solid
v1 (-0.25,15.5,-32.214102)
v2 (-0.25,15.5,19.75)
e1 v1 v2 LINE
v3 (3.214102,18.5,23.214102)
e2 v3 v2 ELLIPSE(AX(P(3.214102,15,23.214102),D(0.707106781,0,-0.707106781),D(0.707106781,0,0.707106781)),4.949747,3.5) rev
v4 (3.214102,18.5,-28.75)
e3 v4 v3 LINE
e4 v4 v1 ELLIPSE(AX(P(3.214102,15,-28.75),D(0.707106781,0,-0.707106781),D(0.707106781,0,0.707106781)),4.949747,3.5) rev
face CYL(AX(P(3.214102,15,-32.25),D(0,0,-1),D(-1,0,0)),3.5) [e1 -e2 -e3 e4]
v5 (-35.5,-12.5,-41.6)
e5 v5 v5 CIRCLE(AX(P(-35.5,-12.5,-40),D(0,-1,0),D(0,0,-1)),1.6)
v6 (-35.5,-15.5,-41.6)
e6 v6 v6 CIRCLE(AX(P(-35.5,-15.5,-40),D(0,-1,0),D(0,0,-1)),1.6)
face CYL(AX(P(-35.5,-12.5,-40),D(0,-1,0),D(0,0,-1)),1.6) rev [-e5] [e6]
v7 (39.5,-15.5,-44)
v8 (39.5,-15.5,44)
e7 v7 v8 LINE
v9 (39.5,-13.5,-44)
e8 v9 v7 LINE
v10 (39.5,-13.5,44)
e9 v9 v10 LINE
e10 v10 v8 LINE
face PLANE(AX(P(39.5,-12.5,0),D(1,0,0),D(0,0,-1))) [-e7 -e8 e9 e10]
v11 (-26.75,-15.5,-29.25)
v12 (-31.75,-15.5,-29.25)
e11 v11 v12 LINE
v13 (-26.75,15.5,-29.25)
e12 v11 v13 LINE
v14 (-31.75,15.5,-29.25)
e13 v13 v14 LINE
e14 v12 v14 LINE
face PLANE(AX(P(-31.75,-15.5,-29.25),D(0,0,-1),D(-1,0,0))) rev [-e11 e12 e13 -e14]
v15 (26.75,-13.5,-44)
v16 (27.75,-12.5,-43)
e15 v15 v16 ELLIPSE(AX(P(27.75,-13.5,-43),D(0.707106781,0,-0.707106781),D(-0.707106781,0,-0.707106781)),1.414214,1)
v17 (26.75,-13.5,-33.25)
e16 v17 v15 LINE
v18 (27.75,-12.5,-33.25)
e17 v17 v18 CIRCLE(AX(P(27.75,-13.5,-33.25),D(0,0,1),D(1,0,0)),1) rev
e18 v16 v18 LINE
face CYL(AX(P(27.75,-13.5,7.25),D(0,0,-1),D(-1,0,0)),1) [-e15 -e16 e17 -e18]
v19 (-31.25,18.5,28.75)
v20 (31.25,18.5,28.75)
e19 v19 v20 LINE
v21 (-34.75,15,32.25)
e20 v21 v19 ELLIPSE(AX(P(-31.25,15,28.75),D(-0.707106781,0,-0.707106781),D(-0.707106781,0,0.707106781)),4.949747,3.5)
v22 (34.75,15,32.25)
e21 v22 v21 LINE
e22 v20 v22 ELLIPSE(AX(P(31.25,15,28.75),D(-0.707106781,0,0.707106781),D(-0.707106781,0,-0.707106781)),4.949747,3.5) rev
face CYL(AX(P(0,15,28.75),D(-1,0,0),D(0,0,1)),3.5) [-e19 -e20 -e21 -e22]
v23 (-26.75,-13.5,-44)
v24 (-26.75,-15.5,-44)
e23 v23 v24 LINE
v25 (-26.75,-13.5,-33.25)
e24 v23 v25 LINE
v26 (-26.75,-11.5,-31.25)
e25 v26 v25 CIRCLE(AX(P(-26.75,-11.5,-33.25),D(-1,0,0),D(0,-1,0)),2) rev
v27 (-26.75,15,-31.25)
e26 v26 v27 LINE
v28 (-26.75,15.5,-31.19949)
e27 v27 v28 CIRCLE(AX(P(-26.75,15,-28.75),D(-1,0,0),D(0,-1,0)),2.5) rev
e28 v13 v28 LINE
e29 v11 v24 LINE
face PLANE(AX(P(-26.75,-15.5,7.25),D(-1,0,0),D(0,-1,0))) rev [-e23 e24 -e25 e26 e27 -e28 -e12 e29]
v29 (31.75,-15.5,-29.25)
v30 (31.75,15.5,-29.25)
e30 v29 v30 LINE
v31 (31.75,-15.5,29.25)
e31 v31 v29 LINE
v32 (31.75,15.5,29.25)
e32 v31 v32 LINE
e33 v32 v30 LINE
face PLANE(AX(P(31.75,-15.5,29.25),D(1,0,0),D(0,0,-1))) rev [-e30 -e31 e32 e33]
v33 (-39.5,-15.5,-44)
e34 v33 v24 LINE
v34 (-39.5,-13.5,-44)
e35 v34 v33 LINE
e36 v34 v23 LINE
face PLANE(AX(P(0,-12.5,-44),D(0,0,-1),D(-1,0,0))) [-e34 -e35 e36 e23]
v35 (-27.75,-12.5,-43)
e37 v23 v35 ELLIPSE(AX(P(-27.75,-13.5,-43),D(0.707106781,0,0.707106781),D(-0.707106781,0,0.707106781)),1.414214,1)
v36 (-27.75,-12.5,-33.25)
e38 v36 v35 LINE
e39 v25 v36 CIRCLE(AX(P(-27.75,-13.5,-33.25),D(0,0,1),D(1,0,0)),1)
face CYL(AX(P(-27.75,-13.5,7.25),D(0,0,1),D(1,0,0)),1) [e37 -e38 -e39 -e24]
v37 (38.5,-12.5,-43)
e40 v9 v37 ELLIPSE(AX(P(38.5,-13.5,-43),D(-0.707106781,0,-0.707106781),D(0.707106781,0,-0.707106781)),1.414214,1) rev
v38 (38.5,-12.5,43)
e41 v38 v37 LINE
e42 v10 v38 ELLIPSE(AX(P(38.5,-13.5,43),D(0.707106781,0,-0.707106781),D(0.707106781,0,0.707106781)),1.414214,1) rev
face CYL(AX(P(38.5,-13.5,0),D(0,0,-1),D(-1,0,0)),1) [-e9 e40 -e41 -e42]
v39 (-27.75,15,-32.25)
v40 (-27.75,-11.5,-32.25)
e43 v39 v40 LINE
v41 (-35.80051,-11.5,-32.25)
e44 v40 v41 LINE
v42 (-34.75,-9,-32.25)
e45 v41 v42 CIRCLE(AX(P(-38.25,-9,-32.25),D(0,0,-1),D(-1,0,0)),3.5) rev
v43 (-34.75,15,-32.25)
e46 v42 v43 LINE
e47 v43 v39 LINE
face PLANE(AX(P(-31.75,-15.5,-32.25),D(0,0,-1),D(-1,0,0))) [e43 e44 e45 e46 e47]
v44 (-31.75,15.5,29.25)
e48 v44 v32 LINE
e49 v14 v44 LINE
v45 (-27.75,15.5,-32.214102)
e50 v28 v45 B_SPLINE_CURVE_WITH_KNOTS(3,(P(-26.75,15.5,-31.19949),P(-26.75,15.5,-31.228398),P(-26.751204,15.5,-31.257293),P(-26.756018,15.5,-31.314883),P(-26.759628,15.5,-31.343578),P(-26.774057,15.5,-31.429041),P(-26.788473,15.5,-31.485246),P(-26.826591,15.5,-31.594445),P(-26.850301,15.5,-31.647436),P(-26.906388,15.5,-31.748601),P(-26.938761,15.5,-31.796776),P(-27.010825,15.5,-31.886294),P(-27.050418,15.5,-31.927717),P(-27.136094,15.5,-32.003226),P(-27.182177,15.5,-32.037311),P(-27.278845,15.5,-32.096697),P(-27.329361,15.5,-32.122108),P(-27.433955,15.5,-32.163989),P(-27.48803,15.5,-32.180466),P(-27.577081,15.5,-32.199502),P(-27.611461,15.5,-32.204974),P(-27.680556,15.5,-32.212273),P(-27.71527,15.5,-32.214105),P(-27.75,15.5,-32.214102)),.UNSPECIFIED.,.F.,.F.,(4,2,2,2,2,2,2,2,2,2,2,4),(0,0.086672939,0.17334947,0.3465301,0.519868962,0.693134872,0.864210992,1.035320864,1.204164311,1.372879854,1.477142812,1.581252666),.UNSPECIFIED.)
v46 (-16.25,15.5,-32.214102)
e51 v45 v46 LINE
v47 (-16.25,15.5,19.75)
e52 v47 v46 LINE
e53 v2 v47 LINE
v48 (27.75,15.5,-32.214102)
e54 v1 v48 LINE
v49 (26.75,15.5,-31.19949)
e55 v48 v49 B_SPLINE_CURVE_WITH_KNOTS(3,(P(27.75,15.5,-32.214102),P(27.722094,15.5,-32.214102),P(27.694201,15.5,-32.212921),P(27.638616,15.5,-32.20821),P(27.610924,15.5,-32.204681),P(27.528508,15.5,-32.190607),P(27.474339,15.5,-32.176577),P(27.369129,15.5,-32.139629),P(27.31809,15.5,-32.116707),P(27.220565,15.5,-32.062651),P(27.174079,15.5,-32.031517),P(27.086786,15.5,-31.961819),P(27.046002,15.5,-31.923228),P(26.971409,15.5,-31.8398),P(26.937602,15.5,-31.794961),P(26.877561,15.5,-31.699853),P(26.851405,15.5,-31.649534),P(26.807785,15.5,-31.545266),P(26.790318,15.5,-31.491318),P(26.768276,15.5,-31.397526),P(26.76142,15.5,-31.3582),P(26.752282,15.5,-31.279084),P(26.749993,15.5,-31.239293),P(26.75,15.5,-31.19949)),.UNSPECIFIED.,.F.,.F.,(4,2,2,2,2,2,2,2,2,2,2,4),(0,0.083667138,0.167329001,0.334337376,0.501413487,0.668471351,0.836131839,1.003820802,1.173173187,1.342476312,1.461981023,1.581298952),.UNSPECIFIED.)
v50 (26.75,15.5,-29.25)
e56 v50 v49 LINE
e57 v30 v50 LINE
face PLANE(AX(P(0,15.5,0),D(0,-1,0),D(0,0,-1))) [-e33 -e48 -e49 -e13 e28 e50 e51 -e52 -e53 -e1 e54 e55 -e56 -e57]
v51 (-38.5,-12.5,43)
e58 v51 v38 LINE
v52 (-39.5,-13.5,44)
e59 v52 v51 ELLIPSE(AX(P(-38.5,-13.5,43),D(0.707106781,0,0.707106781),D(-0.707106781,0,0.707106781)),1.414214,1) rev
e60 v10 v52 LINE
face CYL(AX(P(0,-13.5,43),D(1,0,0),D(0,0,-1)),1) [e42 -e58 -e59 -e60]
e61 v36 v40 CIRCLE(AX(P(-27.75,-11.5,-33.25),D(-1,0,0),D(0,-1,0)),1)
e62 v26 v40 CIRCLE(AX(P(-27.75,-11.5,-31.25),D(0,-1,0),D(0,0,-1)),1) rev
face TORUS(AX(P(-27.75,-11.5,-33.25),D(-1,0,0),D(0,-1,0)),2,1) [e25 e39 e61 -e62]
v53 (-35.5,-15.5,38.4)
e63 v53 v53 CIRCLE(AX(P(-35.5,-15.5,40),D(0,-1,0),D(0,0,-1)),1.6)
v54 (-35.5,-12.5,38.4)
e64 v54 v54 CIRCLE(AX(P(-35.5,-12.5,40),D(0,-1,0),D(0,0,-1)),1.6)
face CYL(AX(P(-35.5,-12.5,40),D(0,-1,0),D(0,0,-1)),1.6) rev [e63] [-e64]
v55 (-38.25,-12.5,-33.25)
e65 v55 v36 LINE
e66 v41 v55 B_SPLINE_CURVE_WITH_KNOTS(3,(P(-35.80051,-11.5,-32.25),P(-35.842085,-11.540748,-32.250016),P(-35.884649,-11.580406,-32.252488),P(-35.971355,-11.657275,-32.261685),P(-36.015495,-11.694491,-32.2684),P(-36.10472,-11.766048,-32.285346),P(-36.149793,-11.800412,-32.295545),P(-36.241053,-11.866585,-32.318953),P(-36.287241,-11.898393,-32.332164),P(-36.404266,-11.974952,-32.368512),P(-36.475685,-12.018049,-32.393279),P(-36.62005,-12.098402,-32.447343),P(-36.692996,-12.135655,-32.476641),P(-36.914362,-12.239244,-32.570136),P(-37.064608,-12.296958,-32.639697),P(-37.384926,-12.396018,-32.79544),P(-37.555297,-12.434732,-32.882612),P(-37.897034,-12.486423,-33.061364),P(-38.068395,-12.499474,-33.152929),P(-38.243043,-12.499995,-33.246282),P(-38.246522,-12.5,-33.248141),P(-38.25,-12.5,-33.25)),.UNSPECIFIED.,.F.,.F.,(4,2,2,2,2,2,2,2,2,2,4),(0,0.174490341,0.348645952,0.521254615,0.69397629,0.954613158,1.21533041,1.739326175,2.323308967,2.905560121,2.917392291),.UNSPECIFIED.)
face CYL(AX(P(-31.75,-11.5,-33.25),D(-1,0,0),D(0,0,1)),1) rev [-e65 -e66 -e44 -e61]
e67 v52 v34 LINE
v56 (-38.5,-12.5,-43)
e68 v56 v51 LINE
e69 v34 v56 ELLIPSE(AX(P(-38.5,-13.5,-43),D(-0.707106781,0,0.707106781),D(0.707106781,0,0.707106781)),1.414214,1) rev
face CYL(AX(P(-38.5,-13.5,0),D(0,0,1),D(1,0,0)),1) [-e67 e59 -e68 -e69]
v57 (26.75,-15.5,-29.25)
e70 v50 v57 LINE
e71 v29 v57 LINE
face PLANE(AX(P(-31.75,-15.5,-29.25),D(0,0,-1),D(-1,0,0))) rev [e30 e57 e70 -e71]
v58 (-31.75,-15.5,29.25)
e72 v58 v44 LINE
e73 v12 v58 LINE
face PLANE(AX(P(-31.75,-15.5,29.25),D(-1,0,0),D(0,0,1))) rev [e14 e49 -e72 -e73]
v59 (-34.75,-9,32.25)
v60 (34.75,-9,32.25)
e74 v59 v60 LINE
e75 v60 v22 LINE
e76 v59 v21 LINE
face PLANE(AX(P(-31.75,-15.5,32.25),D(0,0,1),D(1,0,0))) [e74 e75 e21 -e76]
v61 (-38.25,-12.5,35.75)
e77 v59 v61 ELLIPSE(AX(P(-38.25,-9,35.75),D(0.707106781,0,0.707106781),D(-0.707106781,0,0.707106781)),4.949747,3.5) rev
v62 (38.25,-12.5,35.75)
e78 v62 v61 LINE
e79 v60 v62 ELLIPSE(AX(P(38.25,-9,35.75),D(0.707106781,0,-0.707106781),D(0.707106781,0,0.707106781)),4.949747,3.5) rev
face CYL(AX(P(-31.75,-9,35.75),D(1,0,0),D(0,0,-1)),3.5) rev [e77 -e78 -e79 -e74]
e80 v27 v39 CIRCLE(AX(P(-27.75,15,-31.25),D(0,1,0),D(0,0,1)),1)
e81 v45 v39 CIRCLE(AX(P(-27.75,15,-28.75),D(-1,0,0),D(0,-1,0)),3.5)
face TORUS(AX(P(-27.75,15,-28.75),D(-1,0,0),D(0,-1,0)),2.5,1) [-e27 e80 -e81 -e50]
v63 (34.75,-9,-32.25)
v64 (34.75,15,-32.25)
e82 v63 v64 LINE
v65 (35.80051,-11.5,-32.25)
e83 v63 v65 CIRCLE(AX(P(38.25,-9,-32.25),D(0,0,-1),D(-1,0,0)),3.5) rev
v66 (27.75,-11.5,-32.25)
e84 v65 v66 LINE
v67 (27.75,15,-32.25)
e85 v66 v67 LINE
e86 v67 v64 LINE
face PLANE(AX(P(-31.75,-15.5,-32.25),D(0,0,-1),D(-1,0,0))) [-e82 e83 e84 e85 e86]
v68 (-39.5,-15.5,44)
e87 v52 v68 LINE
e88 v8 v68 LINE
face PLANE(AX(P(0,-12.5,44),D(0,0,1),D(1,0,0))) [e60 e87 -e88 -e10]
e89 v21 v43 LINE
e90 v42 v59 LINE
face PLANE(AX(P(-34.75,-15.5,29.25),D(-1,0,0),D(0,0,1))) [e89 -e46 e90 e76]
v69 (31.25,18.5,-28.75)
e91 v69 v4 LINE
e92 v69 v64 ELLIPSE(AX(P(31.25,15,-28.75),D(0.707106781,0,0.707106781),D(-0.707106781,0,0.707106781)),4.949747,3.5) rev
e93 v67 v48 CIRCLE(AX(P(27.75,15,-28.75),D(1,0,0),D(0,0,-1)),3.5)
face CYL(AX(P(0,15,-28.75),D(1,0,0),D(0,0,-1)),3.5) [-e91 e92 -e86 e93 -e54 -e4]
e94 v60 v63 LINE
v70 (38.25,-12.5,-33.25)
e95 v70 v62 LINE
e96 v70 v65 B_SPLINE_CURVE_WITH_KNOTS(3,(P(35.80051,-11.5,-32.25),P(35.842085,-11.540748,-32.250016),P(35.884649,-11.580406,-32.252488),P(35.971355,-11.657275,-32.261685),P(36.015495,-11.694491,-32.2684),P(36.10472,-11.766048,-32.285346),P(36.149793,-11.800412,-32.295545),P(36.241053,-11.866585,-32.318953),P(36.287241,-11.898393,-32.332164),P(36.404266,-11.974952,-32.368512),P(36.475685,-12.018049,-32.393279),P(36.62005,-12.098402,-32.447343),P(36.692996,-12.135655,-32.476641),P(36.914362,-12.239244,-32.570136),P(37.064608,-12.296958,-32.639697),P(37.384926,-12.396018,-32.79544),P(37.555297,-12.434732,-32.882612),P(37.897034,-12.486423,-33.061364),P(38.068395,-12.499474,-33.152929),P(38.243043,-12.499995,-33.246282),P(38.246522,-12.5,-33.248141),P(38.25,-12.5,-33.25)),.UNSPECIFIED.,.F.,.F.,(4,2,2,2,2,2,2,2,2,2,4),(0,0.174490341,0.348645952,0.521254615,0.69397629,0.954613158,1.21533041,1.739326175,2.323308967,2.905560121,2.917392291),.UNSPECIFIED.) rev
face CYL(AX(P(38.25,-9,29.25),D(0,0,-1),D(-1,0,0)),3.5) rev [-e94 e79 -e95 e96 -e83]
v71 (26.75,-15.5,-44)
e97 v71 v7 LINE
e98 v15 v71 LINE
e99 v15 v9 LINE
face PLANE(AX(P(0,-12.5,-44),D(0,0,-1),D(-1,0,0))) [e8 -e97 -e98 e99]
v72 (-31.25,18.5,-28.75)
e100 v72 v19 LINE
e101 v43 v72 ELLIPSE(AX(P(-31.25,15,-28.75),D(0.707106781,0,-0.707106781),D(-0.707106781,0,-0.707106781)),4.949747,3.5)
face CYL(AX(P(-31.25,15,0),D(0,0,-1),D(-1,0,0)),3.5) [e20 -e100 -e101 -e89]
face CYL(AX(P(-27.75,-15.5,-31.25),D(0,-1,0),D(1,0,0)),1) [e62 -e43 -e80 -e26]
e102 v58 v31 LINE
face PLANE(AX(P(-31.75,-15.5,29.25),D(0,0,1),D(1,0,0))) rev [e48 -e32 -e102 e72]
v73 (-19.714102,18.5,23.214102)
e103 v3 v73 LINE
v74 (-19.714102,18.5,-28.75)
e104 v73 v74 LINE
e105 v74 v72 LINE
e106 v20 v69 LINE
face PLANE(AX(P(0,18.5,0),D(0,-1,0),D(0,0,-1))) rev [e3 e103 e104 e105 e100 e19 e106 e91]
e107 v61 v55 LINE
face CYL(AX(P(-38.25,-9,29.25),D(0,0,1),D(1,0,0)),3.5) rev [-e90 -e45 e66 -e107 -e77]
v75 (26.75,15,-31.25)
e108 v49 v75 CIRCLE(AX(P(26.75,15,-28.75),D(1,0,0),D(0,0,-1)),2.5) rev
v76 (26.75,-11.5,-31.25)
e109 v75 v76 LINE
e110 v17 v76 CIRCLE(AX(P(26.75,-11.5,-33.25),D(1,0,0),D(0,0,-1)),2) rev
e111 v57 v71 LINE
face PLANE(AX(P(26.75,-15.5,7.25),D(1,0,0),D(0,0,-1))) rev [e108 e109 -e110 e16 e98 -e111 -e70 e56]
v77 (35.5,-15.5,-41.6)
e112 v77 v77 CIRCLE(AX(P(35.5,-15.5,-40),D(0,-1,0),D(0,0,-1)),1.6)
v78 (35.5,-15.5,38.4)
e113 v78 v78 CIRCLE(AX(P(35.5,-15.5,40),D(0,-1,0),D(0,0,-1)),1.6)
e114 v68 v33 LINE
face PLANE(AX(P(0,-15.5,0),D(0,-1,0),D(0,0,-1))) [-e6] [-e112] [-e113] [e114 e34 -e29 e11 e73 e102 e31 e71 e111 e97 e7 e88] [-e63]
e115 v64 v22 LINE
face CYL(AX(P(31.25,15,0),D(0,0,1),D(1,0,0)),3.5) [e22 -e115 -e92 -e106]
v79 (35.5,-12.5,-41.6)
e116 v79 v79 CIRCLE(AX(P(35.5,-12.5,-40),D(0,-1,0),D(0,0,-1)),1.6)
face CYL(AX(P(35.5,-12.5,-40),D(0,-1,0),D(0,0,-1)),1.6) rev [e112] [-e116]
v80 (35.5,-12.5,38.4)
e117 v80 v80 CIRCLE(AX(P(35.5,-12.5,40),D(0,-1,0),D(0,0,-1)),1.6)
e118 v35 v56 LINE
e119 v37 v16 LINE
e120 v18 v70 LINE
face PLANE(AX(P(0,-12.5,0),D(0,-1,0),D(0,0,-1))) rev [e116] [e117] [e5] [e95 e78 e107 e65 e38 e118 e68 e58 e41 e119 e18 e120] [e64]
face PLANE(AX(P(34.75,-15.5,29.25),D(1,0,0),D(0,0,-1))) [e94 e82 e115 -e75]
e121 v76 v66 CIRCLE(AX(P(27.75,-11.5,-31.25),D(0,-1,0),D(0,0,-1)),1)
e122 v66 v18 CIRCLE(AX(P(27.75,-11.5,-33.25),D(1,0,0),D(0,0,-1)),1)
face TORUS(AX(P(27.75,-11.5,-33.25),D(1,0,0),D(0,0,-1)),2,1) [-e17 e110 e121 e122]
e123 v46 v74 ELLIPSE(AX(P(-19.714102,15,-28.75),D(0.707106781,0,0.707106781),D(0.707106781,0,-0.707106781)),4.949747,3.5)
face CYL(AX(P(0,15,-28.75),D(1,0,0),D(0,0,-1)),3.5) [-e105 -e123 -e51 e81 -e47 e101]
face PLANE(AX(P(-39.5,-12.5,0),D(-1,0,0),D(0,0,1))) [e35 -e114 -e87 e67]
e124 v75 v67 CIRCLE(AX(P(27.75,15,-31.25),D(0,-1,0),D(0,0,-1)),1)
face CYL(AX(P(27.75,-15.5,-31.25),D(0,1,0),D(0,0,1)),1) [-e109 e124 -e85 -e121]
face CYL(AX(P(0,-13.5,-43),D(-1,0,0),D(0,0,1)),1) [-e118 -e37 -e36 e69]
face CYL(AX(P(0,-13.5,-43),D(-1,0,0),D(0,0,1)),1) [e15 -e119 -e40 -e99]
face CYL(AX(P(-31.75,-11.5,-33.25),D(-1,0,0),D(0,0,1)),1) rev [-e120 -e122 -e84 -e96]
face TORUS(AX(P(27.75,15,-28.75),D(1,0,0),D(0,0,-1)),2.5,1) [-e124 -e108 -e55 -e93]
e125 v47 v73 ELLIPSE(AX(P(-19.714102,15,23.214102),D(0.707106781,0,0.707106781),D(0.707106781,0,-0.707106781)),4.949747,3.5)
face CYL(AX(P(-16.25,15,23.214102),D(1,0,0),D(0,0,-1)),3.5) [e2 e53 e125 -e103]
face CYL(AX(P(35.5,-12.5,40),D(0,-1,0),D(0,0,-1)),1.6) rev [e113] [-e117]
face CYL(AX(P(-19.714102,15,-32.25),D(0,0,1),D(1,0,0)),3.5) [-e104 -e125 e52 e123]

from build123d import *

# Parameters (mm, degrees)
BOSS_EXTRUDE1_DEPTH      = 15.5
BOSS_EXTRUDE1_DEPTH_BACK = 15.5
SKETCH1_W                = 63.5
SKETCH1_H                = 58.5
SHELL1_T                 = 3
SKETCH2_W                = 16
SKETCH2_H                = 52
CUT_EXTRUDE1_DEPTH       = 39.5
SKETCH3_W                = 53.5
SKETCH3_H                = 31
CUT_EXTRUDE2_DEPTH       = 39.5
BOSS_EXTRUDE2_START      = -15.5
SKETCH4_R                = 1.6
BOSS_EXTRUDE2_DEPTH      = 3
FILLET1_R                = 3.5
FILLET2_R                = 1


with BuildPart() as part:
    # Sketch1 → Boss-Extrude1 (new, two sides: drawn at the far end of the back side and taken through both)
    with BuildSketch(Plane(origin=(0, 0, 0), x_dir=(1, 0, 0), z_dir=(0, 1, 0)).offset(-BOSS_EXTRUDE1_DEPTH_BACK)):
        Rectangle(SKETCH1_W, SKETCH1_H)
    extrude(amount=BOSS_EXTRUDE1_DEPTH + BOSS_EXTRUDE1_DEPTH_BACK)

    # Shell1
    shell1_openings = [part.faces().sort_by_distance(p)[0] for p in [
        (0, -15.5, 0),
    ]]
    offset(amount=SHELL1_T, openings=shell1_openings, kind=Kind.INTERSECTION)

    # Sketch2 → Cut-Extrude1 (cut)
    with BuildSketch(Plane(origin=(0, 18.5, 0), x_dir=(1, 0, 0), z_dir=(0, 1, 0))):
        with Locations((-8.25, 6.25)):
            Rectangle(SKETCH2_W, SKETCH2_H)
    extrude(amount=-CUT_EXTRUDE1_DEPTH, mode=Mode.SUBTRACT)

    # Sketch3 → Cut-Extrude2 (cut)
    with BuildSketch(Plane(origin=(0, 0, -32.25), x_dir=(-1, 0, 0), z_dir=(0, 0, -1))):
        Rectangle(SKETCH3_W, SKETCH3_H)
    extrude(amount=-CUT_EXTRUDE2_DEPTH, mode=Mode.SUBTRACT)

    # Sketch4 → Boss-Extrude2 (add)
    with BuildSketch(Plane(origin=(0, 0, 0), x_dir=(1, 0, 0), z_dir=(0, 1, 0)).offset(BOSS_EXTRUDE2_START)):
        Polygon((-26.75, 32.25), (-26.75, 44), (-39.5, 44), (-39.5, -44), (39.5, -44), (39.5, 44), (26.75, 44), (26.75, 32.25), (34.75, 32.25), (34.75, -32.25), (-34.75, -32.25), (-34.75, 32.25), align=None)
        with Locations(Location((-35.5, 40, 0), (0, 0, 90))):
            Circle(SKETCH4_R, mode=Mode.SUBTRACT)
        with Locations(Location((-35.5, -40, 0), (0, 0, 90))):
            Circle(SKETCH4_R, mode=Mode.SUBTRACT)
        with Locations(Location((35.5, -40, 0), (0, 0, 90))):
            Circle(SKETCH4_R, mode=Mode.SUBTRACT)
        with Locations(Location((35.5, 40, 0), (0, 0, 90))):
            Circle(SKETCH4_R, mode=Mode.SUBTRACT)
    extrude(amount=BOSS_EXTRUDE2_DEPTH)

    # Fillet1
    # the kernel refuses this fillet: 3.5 mm, written as the material it adds along each edge
    with BuildSketch(Plane(origin=(34.75, -12.5, -32.25), x_dir=(1, 0, 0), z_dir=(0, 0, 1)), Plane(origin=(-34.75, -12.5, 32.25), x_dir=(-1, 0, 0), z_dir=(0, 0, -1))) as fillet1_piece_1:
        with BuildLine():
            CenterArc((FILLET1_R, FILLET1_R), FILLET1_R, 180, 90)
            Line((0, FILLET1_R), (0, 0))
            Line((0, 0), (FILLET1_R, 0))
        make_face()
    extrude(amount=64.5)
    with BuildSketch(Plane(origin=(34.75, -12.5, 32.25), x_dir=(0, 0, 1), z_dir=(-1, 0, 0))) as fillet1_piece_2:
        with BuildLine():
            CenterArc((FILLET1_R, FILLET1_R), FILLET1_R, 180, 90)
            Line((0, FILLET1_R), (0, 0))
            Line((0, 0), (FILLET1_R, 0))
        make_face()
    extrude(amount=69.5)
    with BuildSketch(Plane(origin=(34.75, -12.5, -32.25), x_dir=(1, 0, 0), z_dir=(0, 0, 1))) as fillet1_piece_3a_section:
        with BuildLine():
            CenterArc((FILLET1_R, FILLET1_R), FILLET1_R, 180, 90)
            Line((0, FILLET1_R), (0, 0))
            Line((0, 0), (FILLET1_R, 0))
        make_face()
    fillet1_piece_3a = extrude(amount=73.25, mode=Mode.PRIVATE)
    fillet1_piece_3a = fillet1_piece_3a - Plane(origin=(35.5, -12.5, 40), x_dir=(0, 0, -1), z_dir=(0, -1, 0)) * Cylinder(1.6, 161, mode=Mode.PRIVATE)
    fillet1_piece_3a = split(fillet1_piece_3a, bisect_by=Plane(origin=(34.75, -12.5, 32.25), z_dir=(0, 0, 1)), keep=Keep.TOP, mode=Mode.PRIVATE)
    with BuildSketch(Plane(origin=(43.5, -12.5, 32.25), x_dir=(0, 0, 1), z_dir=(-1, 0, 0))) as fillet1_piece_3b_section:
        with BuildLine():
            CenterArc((FILLET1_R, FILLET1_R), FILLET1_R, 180, 90)
            Line((0, FILLET1_R), (0, 0))
            Line((0, 0), (FILLET1_R, 0))
        make_face()
    fillet1_piece_3b = extrude(amount=78.25, mode=Mode.PRIVATE)
    fillet1_piece_3b = split(fillet1_piece_3b, bisect_by=Plane(origin=(39.5, -12.5, 32.25), z_dir=(-1, 0, 0)), keep=Keep.TOP, mode=Mode.PRIVATE)
    fillet1_piece_3b = split(fillet1_piece_3b, bisect_by=Plane(origin=(34.75, -12.5, 32.25), z_dir=(1, 0, 0)), keep=Keep.TOP, mode=Mode.PRIVATE)
    fillet1_piece_3 = fillet1_piece_3a & fillet1_piece_3b
    add(fillet1_piece_3)
    with BuildSketch(Plane(origin=(34.75, -12.5, 32.25), x_dir=(0, 0, 1), z_dir=(-1, 0, 0))) as fillet1_piece_4a_section:
        with BuildLine():
            CenterArc((FILLET1_R, FILLET1_R), FILLET1_R, 180, 90)
            Line((0, FILLET1_R), (0, 0))
            Line((0, 0), (FILLET1_R, 0))
        make_face()
    fillet1_piece_4a = extrude(amount=78.25, mode=Mode.PRIVATE)
    fillet1_piece_4a = split(fillet1_piece_4a, bisect_by=Plane(origin=(-39.5, -12.5, 32.25), z_dir=(1, 0, 0)), keep=Keep.TOP, mode=Mode.PRIVATE)
    fillet1_piece_4a = split(fillet1_piece_4a, bisect_by=Plane(origin=(-34.75, -12.5, 32.25), z_dir=(-1, 0, 0)), keep=Keep.TOP, mode=Mode.PRIVATE)
    with BuildSketch(Plane(origin=(-34.75, -12.5, 41), x_dir=(-1, 0, 0), z_dir=(0, 0, -1))) as fillet1_piece_4b_section:
        with BuildLine():
            CenterArc((FILLET1_R, FILLET1_R), FILLET1_R, 180, 90)
            Line((0, FILLET1_R), (0, 0))
            Line((0, 0), (FILLET1_R, 0))
        make_face()
    fillet1_piece_4b = extrude(amount=73.25, mode=Mode.PRIVATE)
    fillet1_piece_4b = fillet1_piece_4b - Plane(origin=(-35.5, -12.5, 40), x_dir=(0, 0, -1), z_dir=(0, -1, 0)) * Cylinder(1.6, 161, mode=Mode.PRIVATE)
    fillet1_piece_4b = split(fillet1_piece_4b, bisect_by=Plane(origin=(-34.75, -12.5, 32.25), z_dir=(0, 0, 1)), keep=Keep.TOP, mode=Mode.PRIVATE)
    fillet1_piece_4 = fillet1_piece_4a & fillet1_piece_4b
    add(fillet1_piece_4)
    # the kernel refuses this fillet: 3.5 mm, written as the material it takes off along each edge
    with BuildSketch(Plane(origin=(-0.25, 18.5, 19.75), x_dir=(0, 0, 1), z_dir=(-1, 0, 0))) as fillet1_2_piece_1:
        with BuildLine():
            CenterArc((3.464101615, -3.5), FILLET1_R, 90, 81.786789298)
            Line((0, -3), (0, 0))
            Line((0, 0), (3.464101615, 0))
        make_face()
    extrude(amount=16, mode=Mode.SUBTRACT)
    with BuildSketch(Plane(origin=(-0.25, 18.5, -40.910254038), x_dir=(1, 0, 0), z_dir=(0, 0, 1)), Plane(origin=(-16.25, 18.5, 19.75), x_dir=(-1, 0, 0), z_dir=(0, 0, -1))) as fillet1_2_piece_2:
        with BuildLine():
            CenterArc((3.464101615, -3.5), FILLET1_R, 90, 81.786789298)
            Line((0, -3), (0, 0))
            Line((0, 0), (3.464101615, 0))
        make_face()
    extrude(amount=60.660254038, mode=Mode.SUBTRACT)
    with BuildSketch(Plane(origin=(-7.5, 18.5, -32.25), x_dir=(0, 0, 1), z_dir=(-1, 0, 0))) as fillet1_2_piece_3:
        with BuildLine():
            CenterArc((FILLET1_R, -FILLET1_R), FILLET1_R, 90, 90)
            Line((0, -FILLET1_R), (0, 0))
            Line((0, 0), (FILLET1_R, 0))
        make_face()
    extrude(amount=36, mode=Mode.SUBTRACT)
    with BuildSketch(Plane(origin=(43.5, 18.5, -32.25), x_dir=(0, 0, 1), z_dir=(-1, 0, 0))) as fillet1_2_piece_4:
        with BuildLine():
            CenterArc((FILLET1_R, -FILLET1_R), FILLET1_R, 90, 90)
            Line((0, -FILLET1_R), (0, 0))
            Line((0, 0), (FILLET1_R, 0))
        make_face()
    extrude(amount=52.5, mode=Mode.SUBTRACT)
    with BuildSketch(Plane(origin=(-34.75, 18.5, 41), x_dir=(0, -1, 0), z_dir=(0, 0, -1))) as fillet1_2_piece_5:
        with BuildLine():
            CenterArc((FILLET1_R, -FILLET1_R), FILLET1_R, 90, 90)
            Line((0, -FILLET1_R), (0, 0))
            Line((0, 0), (FILLET1_R, 0))
        make_face()
    extrude(amount=82, mode=Mode.SUBTRACT)
    with BuildSketch(Plane(origin=(34.75, 18.5, 41), x_dir=(0, -1, 0), z_dir=(0, 0, -1))) as fillet1_2_piece_6:
        with BuildLine():
            CenterArc((FILLET1_R, FILLET1_R), FILLET1_R, 180, 90)
            Line((0, FILLET1_R), (0, 0))
            Line((0, 0), (FILLET1_R, 0))
        make_face()
    extrude(amount=82, mode=Mode.SUBTRACT)
    with BuildSketch(Plane(origin=(-43.5, 18.5, 32.25), x_dir=(0, -1, 0), z_dir=(1, 0, 0))) as fillet1_2_piece_7:
        with BuildLine():
            CenterArc((FILLET1_R, FILLET1_R), FILLET1_R, 180, 90)
            Line((0, FILLET1_R), (0, 0))
            Line((0, 0), (FILLET1_R, 0))
        make_face()
    extrude(amount=87, mode=Mode.SUBTRACT)
    with BuildSketch(Plane(origin=(8.410254038, 18.5, 19.75), x_dir=(0, 0, 1), z_dir=(-1, 0, 0))) as fillet1_2_piece_8a_section:
        with BuildLine():
            CenterArc((3.464101615, -3.5), FILLET1_R, 90, 81.786789298)
            Line((0, -3), (0, 0))
            Line((0, 0), (3.464101615, 0))
        make_face()
    fillet1_2_piece_8a = extrude(amount=24.660254038, mode=Mode.PRIVATE)
    fillet1_2_piece_8a = split(fillet1_2_piece_8a, bisect_by=Plane(origin=(-0.25, 18.5, 19.75), z_dir=(1, 0, 0)), keep=Keep.TOP, mode=Mode.PRIVATE)
    with BuildSketch(Plane(origin=(-0.25, 18.5, -32.25), x_dir=(1, 0, 0), z_dir=(0, 0, 1))) as fillet1_2_piece_8b_section:
        with BuildLine():
            CenterArc((3.464101615, -3.5), FILLET1_R, 90, 81.786789298)
            Line((0, -3), (0, 0))
            Line((0, 0), (3.464101615, 0))
        make_face()
    fillet1_2_piece_8b = extrude(amount=60.660254038, mode=Mode.PRIVATE)
    fillet1_2_piece_8b = split(fillet1_2_piece_8b, bisect_by=Plane(origin=(-0.25, 18.5, 19.75), z_dir=(0, 0, 1)), keep=Keep.TOP, mode=Mode.PRIVATE)
    fillet1_2_piece_8 = fillet1_2_piece_8a & fillet1_2_piece_8b
    add(fillet1_2_piece_8, mode=Mode.SUBTRACT)
    with BuildSketch(Plane(origin=(-16.25, 18.5, 28.410254038), x_dir=(-1, 0, 0), z_dir=(0, 0, -1))) as fillet1_2_piece_9a_section:
        with BuildLine():
            CenterArc((3.464101615, -3.5), FILLET1_R, 90, 81.786789298)
            Line((0, -3), (0, 0))
            Line((0, 0), (3.464101615, 0))
        make_face()
    fillet1_2_piece_9a = extrude(amount=60.660254038, mode=Mode.PRIVATE)
    fillet1_2_piece_9a = split(fillet1_2_piece_9a, bisect_by=Plane(origin=(-16.25, 18.5, 19.75), z_dir=(0, 0, 1)), keep=Keep.TOP, mode=Mode.PRIVATE)
    with BuildSketch(Plane(origin=(-0.25, 18.5, 19.75), x_dir=(0, 0, 1), z_dir=(-1, 0, 0))) as fillet1_2_piece_9b_section:
        with BuildLine():
            CenterArc((3.464101615, -3.5), FILLET1_R, 90, 81.786789298)
            Line((0, -3), (0, 0))
            Line((0, 0), (3.464101615, 0))
        make_face()
    fillet1_2_piece_9b = extrude(amount=24.660254038, mode=Mode.PRIVATE)
    fillet1_2_piece_9b = split(fillet1_2_piece_9b, bisect_by=Plane(origin=(-16.25, 18.5, 19.75), z_dir=(-1, 0, 0)), keep=Keep.TOP, mode=Mode.PRIVATE)
    fillet1_2_piece_9 = fillet1_2_piece_9a & fillet1_2_piece_9b
    add(fillet1_2_piece_9, mode=Mode.SUBTRACT)

    # Fillet2
    fillet2_edges = [part.edges().sort_by_distance(p)[0] for p in [
        (26.75, -12.5, -38.125),
        (32.5, -12.5, -32.25),
        (-32.5, -12.5, -32.25),
        (-26.75, -12.5, -38.125),
        (-33.125, -12.5, -44),
        (-39.5, -12.5, 0),
        (0, -12.5, 44),
        (39.5, -12.5, 0),
        (33.125, -12.5, -44),
        (-26.75, 15.250643519, -32.241013868),
        (26.75, 1.25, -32.25),
        (26.75, 15.250643519, -32.241013868),
        (-26.75, 1.25, -32.25),
    ]]
    fillet(fillet2_edges, radius=FILLET2_R)


solid = part.part
